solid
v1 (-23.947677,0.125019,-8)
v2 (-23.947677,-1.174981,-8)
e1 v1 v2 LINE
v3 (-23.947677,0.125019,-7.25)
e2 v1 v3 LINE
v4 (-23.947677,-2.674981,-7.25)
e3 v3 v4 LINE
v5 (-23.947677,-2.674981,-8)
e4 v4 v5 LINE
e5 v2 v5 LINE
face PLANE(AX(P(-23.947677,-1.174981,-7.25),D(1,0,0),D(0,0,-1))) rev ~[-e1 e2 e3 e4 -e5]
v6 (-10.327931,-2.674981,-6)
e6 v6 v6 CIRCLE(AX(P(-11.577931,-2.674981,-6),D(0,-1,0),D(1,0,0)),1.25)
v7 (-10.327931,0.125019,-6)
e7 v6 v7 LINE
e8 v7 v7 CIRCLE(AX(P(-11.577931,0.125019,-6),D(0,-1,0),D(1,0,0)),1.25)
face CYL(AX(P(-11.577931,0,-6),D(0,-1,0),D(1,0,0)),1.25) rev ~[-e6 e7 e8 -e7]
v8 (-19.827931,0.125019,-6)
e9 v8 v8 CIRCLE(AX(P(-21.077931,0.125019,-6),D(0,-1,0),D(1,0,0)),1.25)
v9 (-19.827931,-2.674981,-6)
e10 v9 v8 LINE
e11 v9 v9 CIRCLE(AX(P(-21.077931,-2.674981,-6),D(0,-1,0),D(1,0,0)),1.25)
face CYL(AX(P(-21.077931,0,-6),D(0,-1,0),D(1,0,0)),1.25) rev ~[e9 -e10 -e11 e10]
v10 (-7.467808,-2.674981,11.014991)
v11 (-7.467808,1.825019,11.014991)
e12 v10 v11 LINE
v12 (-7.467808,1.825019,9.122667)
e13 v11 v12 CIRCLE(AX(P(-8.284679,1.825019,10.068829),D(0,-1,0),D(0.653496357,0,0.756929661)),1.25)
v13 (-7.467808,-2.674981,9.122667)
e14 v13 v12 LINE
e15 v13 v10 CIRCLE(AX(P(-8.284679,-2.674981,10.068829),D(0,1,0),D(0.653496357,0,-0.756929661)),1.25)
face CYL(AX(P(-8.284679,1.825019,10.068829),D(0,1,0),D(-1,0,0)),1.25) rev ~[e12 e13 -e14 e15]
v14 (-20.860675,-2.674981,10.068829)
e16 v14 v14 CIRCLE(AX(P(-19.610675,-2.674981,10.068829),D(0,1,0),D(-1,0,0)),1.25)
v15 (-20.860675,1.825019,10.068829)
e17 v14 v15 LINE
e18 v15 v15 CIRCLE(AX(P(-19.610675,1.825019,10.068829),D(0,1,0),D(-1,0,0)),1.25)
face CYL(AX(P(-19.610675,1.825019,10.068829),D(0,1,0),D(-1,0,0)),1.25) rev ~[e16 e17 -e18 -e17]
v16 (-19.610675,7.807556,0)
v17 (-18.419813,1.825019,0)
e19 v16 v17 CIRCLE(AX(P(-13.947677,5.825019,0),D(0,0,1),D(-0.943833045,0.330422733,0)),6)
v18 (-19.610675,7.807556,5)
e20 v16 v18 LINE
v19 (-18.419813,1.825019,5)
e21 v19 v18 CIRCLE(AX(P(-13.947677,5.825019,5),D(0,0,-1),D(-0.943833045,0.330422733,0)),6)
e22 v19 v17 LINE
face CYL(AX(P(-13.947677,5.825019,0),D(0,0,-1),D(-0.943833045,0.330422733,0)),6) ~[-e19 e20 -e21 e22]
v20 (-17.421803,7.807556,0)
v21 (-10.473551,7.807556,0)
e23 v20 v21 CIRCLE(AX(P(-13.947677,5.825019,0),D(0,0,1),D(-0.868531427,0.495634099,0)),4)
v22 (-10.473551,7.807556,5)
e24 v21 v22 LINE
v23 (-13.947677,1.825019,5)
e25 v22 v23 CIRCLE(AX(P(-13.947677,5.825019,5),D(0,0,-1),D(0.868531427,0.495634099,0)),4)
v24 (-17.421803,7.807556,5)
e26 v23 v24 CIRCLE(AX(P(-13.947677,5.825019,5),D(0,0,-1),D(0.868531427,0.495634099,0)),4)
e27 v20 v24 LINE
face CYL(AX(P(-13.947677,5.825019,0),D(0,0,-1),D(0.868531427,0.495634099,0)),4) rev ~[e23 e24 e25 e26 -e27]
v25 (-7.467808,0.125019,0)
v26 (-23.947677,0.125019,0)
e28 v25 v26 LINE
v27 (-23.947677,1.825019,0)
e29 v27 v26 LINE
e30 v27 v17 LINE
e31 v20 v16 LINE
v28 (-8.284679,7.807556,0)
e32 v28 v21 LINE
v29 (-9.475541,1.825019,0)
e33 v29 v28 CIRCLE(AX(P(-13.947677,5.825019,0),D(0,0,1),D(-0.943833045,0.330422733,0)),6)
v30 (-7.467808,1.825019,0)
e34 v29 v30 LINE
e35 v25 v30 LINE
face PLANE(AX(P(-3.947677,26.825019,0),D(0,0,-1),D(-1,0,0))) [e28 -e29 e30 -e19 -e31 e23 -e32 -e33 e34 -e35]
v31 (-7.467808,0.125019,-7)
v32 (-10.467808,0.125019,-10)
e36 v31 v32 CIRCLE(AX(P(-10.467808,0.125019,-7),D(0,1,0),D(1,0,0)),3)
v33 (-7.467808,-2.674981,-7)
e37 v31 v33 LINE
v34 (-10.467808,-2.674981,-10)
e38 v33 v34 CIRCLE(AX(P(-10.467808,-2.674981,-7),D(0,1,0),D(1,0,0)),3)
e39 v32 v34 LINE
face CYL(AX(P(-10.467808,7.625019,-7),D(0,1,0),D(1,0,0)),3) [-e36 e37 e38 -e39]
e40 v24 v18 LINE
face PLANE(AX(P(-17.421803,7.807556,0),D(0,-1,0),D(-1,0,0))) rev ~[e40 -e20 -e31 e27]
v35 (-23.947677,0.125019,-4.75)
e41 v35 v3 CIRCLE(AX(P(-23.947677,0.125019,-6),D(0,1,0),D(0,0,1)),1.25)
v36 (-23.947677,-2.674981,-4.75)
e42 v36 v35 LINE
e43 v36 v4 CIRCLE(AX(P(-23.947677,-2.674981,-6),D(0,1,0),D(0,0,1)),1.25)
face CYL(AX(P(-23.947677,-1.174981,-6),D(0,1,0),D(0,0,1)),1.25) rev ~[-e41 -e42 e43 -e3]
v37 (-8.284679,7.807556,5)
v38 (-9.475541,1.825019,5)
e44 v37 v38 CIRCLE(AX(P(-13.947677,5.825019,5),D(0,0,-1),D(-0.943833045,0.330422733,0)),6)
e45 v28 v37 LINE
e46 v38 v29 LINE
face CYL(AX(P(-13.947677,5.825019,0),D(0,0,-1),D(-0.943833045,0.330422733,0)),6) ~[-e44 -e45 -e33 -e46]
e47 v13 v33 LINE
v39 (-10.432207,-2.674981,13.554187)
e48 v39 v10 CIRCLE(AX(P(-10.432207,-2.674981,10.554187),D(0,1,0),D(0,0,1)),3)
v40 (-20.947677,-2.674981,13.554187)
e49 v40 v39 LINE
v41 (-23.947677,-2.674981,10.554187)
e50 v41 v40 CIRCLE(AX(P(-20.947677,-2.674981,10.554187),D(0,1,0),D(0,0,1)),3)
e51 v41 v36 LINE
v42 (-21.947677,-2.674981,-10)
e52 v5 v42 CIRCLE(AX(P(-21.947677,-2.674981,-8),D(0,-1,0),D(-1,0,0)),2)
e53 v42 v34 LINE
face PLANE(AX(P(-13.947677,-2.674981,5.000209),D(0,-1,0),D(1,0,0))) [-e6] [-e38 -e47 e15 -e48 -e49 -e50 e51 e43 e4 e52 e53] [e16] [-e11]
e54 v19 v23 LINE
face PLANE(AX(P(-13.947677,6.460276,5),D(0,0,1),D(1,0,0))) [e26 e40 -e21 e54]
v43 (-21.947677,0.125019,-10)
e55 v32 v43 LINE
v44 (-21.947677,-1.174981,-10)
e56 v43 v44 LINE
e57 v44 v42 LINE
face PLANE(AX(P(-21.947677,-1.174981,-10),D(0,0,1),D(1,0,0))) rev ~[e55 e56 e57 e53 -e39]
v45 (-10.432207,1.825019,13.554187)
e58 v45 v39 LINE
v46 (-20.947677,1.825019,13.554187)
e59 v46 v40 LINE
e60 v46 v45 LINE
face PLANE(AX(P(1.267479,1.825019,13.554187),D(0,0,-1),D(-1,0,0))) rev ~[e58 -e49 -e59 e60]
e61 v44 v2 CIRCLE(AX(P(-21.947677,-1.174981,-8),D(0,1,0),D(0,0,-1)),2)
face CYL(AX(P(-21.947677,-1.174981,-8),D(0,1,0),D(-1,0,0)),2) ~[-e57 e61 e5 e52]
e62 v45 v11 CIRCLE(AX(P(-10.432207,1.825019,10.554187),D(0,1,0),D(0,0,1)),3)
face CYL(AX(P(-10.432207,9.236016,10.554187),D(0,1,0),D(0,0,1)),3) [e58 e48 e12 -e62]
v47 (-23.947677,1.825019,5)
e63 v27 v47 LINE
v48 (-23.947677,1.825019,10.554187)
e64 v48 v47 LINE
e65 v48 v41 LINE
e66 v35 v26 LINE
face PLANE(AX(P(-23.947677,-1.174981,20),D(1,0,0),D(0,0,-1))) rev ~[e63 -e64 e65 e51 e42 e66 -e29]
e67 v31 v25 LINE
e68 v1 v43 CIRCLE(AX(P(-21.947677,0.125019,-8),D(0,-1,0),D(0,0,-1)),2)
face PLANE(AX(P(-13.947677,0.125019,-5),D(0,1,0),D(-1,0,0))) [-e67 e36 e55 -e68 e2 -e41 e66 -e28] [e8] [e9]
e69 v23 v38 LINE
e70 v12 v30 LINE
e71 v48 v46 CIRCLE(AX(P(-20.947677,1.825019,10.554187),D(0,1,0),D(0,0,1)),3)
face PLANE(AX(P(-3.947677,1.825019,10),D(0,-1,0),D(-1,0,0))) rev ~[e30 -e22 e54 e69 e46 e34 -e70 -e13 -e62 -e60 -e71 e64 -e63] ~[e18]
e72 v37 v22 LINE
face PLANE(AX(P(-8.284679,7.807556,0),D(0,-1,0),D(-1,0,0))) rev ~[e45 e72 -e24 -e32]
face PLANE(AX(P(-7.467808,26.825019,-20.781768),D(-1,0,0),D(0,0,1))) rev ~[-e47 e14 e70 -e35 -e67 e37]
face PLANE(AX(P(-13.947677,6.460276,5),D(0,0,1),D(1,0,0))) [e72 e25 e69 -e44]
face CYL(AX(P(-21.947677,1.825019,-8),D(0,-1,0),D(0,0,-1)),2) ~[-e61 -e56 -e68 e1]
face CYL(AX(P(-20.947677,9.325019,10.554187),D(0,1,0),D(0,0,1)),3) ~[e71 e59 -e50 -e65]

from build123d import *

# Parameters (mm, degrees)
F1_DEPTH     = 20
F3_DEPTH     = 10
F4_R         = 1.25
F5_DEPTH     = 2.2
F7_DEPTH     = 10
F9_R         = 1.25
F10_DEPTH    = 28.001
F11_R        = 2
F14_DEPTH    = 1.5
F16_W        = 20
F16_H        = 10
F17_DEPTH    = 26.7
F19_R        = 1.25
F20_DEPTH    = 32.1
F22_W        = 20
F22_H        = 9.2705127583
F23_DEPTH    = 6.9
F24_DEPTH    = 2.9
F25_R        = 1.25
F26_DEPTH    = 12.5
F27_W        = 15.1660433039
F27_H        = 51.5122525394
F28_DEPTH    = 40.7
F29_W        = 35.2513279067
F29_H        = 19.1500885412
F30_DEPTH    = 12.5
F31_T1_DEPTH = 17.8
F31_T3_DEPTH = 19.5
F31_T5_DEPTH = 19.3219931649


# Not quite as in the source:
# - a fillet or chamfer that OpenCascade refuses, or shapes differently, is made with other operations: its cross-section is extruded or revolved along the edge and cut away or added


with BuildPart() as f1:
    # F0 (on Top) → F1 (new body)
    with BuildSketch(Plane.XY):
        with BuildLine():
            Line((-17.4218026286, 7.8075558554), (-19.6106751933, 7.8075558554))
            ThreePointArc((-19.6106751933, 7.8075558554), (-13.947676921, -0.1749805422), (-8.2846786486, 7.8075558554))
            Line((-8.2846786486, 7.8075558554), (-10.4735512133, 7.8075558554))
            ThreePointArc((-10.4735512133, 7.8075558554), (-13.947676921, 1.8250194578), (-17.4218026286, 7.8075558554))
        make_face()
    extrude(amount=F1_DEPTH)

    # F2 (on Top) → F3 (join, symmetric)
    with BuildSketch(Plane.XY):
        Polygon((-3.947676921, 1.8250194578), (-13.947676921, 1.8250194578), (-23.947676921, 1.8250194578), (-23.947676921, -1.1749805422), (-3.947676921, -1.1749805422), align=None)
    extrude(amount=F3_DEPTH, both=True)

    # F4 (on Front) → F5 (cut, symmetric)
    with BuildSketch(Plane.XZ):
        with Locations((-11.5779312328, -6)):
            Circle(F4_R)
        with Locations((-21.0779312328, -6)):
            Circle(F4_R)
    extrude(amount=F5_DEPTH, both=True, mode=Mode.SUBTRACT)

    # F6 (on face) → F7 (join, through all)
    with BuildSketch(Plane.XY.offset(10)):
        with BuildLine():
            Line((-3.947676921, 1.8250194578), (-9.475540966, 1.8250194578))
            ThreePointArc((-9.475540966, 1.8250194578), (-13.947676921, -0.1749805422), (-18.419812876, 1.8250194578))
            Line((-18.419812876, 1.8250194578), (-23.947676921, 1.8250194578))
            Line((-23.947676921, 1.8250194578), (-23.947676921, -1.1749805422))
            Line((-23.947676921, -1.1749805422), (-3.947676921, -1.1749805422))
            Line((-3.947676921, -1.1749805422), (-3.947676921, 1.8250194578))
        make_face()
    extrude(amount=F7_DEPTH)

    # F9 (on offset) → F10 (cut, through all)
    with BuildSketch(Plane(origin=(0, 26.8250194578, 0), x_dir=(-1, 0, 0), z_dir=(0, 1, 0))):
        with Locations((23.947676921, -6)):
            Circle(F9_R)
        with Locations((3.947676921, -6)):
            Circle(F9_R)
    extrude(amount=-F10_DEPTH, mode=Mode.SUBTRACT)

    # F11
    f11_edges = [f1.edges().sort_by_distance(p)[0] for p in [
        (-23.947677, 0.325019, -10),
        (-3.947677, 0.325019, -10),
    ]]
    fillet(f11_edges, radius=F11_R)

    # F13 (on offset) → F14 (join)
    with BuildSketch(Plane.XZ.offset(1.1749805422)):
        with BuildLine():
            ThreePointArc((-23.947676921, -4.75), (-22.697676921, -6), (-23.947676921, -7.25))
            Line((-23.947676921, -7.25), (-23.947676921, -8))
            ThreePointArc((-23.947676921, -8), (-23.3618904833, -9.4142135624), (-21.947676921, -10))
            Line((-21.947676921, -10), (-5.947676921, -10))
            ThreePointArc((-5.947676921, -10), (-4.5334633586, -9.4142135624), (-3.947676921, -8))
            Line((-3.947676921, -8), (-3.947676921, -7.25))
            ThreePointArc((-3.947676921, -7.25), (-5.197676921, -6), (-3.947676921, -4.75))
            Line((-3.947676921, -4.75), (-3.947676921, 20))
            Line((-3.947676921, 20), (-23.947676921, 20))
            Line((-23.947676921, 20), (-23.947676921, -4.75))
        make_face()
    extrude(amount=F14_DEPTH)

    # F16 (on offset) → F17 (cut)
    with BuildSketch(Plane(origin=(0, 26.8250194578, 0), x_dir=(-1, 0, 0), z_dir=(0, 1, 0))):
        with Locations((13.947676921, -5)):
            Rectangle(F16_W, F16_H)
    extrude(amount=-F17_DEPTH, mode=Mode.SUBTRACT)

    # F19 (on offset) → F20 (cut)
    with BuildSketch(Plane.XZ.offset(25)):
        with Locations((-11.5779312328, -6)):
            Circle(F19_R)
        with Locations((-21.0779312328, -6)):
            Circle(F19_R)
    extrude(amount=-F20_DEPTH, mode=Mode.SUBTRACT)

    # F22 (on offset) → F23 (cut)
    with BuildSketch(Plane.XY.offset(11.9)):
        with Locations((-13.947676921, 6.460275837)):
            Rectangle(F22_W, F22_H)
    extrude(amount=-F23_DEPTH, mode=Mode.SUBTRACT)

    # F22 (on offset) → F24 (cut)
    with BuildSketch(Plane.XY.offset(11.9)):
        with Locations((-13.947676921, 6.460275837)):
            Rectangle(F22_W, F22_H)
    extrude(amount=F24_DEPTH, mode=Mode.SUBTRACT)

    # F25 (on offset) → F26 (cut, symmetric)
    with BuildSketch(Plane(origin=(0, 1.8250194578, 0), x_dir=(-1, 0, 0), z_dir=(0, 1, 0))):
        with Locations((8.2846786486, 10.0688289385)):
            Circle(F25_R)
        with Locations((19.6106751933, 10.0688289385)):
            Circle(F25_R)
    extrude(amount=F26_DEPTH, both=True, mode=Mode.SUBTRACT)

    # F27 (on offset) → F28 (cut)
    with BuildSketch(Plane(origin=(0, 26.8250194578, 0), x_dir=(-1, 0, 0), z_dir=(0, 1, 0))):
        with Locations((-0.11521345, 4.9743577838)):
            Rectangle(F27_W, F27_H)
    extrude(amount=-F28_DEPTH, mode=Mode.SUBTRACT)

    # F29 (on face) → F30 (cut, symmetric)
    with BuildSketch(Plane(origin=(0, 1.8250194578, 0), x_dir=(-1, 0, 0), z_dir=(0, 1, 0))):
        with Locations((16.3581850356, 23.1292308308)):
            Rectangle(F29_W, F29_H)
    extrude(amount=F30_DEPTH, both=True, mode=Mode.SUBTRACT)

    # F31: fillet of radius 3 on 3 edges, made by hand

    # F31_s2 → F31_t1 (cut)
    with BuildSketch(Plane.XZ.offset(-7.6250194578)):
        with BuildLine():
            ThreePointArc((-7.4678082019, -7), (-8.3464878583, -9.1213203436), (-10.4678082019, -10))
            Line((-10.4678082019, -10), (-7.4678082019, -10))
            Line((-7.4678082019, -10), (-7.4678082019, -7))
        make_face()
    extrude(amount=F31_T1_DEPTH, mode=Mode.SUBTRACT)

    # F31_s4 → F31_t3 (cut)
    with BuildSketch(Plane.XZ.offset(-9.3250194578)):
        with BuildLine():
            ThreePointArc((-20.947676921, 13.5541865602), (-23.0689972645, 12.6755069038), (-23.947676921, 10.5541865602))
            Line((-23.947676921, 10.5541865602), (-23.947676921, 13.5541865602))
            Line((-23.947676921, 13.5541865602), (-20.947676921, 13.5541865602))
        make_face()
    extrude(amount=F31_T3_DEPTH, mode=Mode.SUBTRACT)

    # F31_s6 → F31_t5 (cut)
    with BuildSketch(Plane.XZ.offset(-9.2360160403)):
        with BuildLine():
            ThreePointArc((-10.4322068349, 13.5541865602), (-8.4805938304, 12.8326085319), (-7.4678082019, 11.0149910141))
            Line((-7.4678082019, 11.0149910141), (-7.4678082019, 13.5541865602))
            Line((-7.4678082019, 13.5541865602), (-10.4322068349, 13.5541865602))
        make_face()
    extrude(amount=F31_T5_DEPTH, mode=Mode.SUBTRACT)


solid = f1.part
